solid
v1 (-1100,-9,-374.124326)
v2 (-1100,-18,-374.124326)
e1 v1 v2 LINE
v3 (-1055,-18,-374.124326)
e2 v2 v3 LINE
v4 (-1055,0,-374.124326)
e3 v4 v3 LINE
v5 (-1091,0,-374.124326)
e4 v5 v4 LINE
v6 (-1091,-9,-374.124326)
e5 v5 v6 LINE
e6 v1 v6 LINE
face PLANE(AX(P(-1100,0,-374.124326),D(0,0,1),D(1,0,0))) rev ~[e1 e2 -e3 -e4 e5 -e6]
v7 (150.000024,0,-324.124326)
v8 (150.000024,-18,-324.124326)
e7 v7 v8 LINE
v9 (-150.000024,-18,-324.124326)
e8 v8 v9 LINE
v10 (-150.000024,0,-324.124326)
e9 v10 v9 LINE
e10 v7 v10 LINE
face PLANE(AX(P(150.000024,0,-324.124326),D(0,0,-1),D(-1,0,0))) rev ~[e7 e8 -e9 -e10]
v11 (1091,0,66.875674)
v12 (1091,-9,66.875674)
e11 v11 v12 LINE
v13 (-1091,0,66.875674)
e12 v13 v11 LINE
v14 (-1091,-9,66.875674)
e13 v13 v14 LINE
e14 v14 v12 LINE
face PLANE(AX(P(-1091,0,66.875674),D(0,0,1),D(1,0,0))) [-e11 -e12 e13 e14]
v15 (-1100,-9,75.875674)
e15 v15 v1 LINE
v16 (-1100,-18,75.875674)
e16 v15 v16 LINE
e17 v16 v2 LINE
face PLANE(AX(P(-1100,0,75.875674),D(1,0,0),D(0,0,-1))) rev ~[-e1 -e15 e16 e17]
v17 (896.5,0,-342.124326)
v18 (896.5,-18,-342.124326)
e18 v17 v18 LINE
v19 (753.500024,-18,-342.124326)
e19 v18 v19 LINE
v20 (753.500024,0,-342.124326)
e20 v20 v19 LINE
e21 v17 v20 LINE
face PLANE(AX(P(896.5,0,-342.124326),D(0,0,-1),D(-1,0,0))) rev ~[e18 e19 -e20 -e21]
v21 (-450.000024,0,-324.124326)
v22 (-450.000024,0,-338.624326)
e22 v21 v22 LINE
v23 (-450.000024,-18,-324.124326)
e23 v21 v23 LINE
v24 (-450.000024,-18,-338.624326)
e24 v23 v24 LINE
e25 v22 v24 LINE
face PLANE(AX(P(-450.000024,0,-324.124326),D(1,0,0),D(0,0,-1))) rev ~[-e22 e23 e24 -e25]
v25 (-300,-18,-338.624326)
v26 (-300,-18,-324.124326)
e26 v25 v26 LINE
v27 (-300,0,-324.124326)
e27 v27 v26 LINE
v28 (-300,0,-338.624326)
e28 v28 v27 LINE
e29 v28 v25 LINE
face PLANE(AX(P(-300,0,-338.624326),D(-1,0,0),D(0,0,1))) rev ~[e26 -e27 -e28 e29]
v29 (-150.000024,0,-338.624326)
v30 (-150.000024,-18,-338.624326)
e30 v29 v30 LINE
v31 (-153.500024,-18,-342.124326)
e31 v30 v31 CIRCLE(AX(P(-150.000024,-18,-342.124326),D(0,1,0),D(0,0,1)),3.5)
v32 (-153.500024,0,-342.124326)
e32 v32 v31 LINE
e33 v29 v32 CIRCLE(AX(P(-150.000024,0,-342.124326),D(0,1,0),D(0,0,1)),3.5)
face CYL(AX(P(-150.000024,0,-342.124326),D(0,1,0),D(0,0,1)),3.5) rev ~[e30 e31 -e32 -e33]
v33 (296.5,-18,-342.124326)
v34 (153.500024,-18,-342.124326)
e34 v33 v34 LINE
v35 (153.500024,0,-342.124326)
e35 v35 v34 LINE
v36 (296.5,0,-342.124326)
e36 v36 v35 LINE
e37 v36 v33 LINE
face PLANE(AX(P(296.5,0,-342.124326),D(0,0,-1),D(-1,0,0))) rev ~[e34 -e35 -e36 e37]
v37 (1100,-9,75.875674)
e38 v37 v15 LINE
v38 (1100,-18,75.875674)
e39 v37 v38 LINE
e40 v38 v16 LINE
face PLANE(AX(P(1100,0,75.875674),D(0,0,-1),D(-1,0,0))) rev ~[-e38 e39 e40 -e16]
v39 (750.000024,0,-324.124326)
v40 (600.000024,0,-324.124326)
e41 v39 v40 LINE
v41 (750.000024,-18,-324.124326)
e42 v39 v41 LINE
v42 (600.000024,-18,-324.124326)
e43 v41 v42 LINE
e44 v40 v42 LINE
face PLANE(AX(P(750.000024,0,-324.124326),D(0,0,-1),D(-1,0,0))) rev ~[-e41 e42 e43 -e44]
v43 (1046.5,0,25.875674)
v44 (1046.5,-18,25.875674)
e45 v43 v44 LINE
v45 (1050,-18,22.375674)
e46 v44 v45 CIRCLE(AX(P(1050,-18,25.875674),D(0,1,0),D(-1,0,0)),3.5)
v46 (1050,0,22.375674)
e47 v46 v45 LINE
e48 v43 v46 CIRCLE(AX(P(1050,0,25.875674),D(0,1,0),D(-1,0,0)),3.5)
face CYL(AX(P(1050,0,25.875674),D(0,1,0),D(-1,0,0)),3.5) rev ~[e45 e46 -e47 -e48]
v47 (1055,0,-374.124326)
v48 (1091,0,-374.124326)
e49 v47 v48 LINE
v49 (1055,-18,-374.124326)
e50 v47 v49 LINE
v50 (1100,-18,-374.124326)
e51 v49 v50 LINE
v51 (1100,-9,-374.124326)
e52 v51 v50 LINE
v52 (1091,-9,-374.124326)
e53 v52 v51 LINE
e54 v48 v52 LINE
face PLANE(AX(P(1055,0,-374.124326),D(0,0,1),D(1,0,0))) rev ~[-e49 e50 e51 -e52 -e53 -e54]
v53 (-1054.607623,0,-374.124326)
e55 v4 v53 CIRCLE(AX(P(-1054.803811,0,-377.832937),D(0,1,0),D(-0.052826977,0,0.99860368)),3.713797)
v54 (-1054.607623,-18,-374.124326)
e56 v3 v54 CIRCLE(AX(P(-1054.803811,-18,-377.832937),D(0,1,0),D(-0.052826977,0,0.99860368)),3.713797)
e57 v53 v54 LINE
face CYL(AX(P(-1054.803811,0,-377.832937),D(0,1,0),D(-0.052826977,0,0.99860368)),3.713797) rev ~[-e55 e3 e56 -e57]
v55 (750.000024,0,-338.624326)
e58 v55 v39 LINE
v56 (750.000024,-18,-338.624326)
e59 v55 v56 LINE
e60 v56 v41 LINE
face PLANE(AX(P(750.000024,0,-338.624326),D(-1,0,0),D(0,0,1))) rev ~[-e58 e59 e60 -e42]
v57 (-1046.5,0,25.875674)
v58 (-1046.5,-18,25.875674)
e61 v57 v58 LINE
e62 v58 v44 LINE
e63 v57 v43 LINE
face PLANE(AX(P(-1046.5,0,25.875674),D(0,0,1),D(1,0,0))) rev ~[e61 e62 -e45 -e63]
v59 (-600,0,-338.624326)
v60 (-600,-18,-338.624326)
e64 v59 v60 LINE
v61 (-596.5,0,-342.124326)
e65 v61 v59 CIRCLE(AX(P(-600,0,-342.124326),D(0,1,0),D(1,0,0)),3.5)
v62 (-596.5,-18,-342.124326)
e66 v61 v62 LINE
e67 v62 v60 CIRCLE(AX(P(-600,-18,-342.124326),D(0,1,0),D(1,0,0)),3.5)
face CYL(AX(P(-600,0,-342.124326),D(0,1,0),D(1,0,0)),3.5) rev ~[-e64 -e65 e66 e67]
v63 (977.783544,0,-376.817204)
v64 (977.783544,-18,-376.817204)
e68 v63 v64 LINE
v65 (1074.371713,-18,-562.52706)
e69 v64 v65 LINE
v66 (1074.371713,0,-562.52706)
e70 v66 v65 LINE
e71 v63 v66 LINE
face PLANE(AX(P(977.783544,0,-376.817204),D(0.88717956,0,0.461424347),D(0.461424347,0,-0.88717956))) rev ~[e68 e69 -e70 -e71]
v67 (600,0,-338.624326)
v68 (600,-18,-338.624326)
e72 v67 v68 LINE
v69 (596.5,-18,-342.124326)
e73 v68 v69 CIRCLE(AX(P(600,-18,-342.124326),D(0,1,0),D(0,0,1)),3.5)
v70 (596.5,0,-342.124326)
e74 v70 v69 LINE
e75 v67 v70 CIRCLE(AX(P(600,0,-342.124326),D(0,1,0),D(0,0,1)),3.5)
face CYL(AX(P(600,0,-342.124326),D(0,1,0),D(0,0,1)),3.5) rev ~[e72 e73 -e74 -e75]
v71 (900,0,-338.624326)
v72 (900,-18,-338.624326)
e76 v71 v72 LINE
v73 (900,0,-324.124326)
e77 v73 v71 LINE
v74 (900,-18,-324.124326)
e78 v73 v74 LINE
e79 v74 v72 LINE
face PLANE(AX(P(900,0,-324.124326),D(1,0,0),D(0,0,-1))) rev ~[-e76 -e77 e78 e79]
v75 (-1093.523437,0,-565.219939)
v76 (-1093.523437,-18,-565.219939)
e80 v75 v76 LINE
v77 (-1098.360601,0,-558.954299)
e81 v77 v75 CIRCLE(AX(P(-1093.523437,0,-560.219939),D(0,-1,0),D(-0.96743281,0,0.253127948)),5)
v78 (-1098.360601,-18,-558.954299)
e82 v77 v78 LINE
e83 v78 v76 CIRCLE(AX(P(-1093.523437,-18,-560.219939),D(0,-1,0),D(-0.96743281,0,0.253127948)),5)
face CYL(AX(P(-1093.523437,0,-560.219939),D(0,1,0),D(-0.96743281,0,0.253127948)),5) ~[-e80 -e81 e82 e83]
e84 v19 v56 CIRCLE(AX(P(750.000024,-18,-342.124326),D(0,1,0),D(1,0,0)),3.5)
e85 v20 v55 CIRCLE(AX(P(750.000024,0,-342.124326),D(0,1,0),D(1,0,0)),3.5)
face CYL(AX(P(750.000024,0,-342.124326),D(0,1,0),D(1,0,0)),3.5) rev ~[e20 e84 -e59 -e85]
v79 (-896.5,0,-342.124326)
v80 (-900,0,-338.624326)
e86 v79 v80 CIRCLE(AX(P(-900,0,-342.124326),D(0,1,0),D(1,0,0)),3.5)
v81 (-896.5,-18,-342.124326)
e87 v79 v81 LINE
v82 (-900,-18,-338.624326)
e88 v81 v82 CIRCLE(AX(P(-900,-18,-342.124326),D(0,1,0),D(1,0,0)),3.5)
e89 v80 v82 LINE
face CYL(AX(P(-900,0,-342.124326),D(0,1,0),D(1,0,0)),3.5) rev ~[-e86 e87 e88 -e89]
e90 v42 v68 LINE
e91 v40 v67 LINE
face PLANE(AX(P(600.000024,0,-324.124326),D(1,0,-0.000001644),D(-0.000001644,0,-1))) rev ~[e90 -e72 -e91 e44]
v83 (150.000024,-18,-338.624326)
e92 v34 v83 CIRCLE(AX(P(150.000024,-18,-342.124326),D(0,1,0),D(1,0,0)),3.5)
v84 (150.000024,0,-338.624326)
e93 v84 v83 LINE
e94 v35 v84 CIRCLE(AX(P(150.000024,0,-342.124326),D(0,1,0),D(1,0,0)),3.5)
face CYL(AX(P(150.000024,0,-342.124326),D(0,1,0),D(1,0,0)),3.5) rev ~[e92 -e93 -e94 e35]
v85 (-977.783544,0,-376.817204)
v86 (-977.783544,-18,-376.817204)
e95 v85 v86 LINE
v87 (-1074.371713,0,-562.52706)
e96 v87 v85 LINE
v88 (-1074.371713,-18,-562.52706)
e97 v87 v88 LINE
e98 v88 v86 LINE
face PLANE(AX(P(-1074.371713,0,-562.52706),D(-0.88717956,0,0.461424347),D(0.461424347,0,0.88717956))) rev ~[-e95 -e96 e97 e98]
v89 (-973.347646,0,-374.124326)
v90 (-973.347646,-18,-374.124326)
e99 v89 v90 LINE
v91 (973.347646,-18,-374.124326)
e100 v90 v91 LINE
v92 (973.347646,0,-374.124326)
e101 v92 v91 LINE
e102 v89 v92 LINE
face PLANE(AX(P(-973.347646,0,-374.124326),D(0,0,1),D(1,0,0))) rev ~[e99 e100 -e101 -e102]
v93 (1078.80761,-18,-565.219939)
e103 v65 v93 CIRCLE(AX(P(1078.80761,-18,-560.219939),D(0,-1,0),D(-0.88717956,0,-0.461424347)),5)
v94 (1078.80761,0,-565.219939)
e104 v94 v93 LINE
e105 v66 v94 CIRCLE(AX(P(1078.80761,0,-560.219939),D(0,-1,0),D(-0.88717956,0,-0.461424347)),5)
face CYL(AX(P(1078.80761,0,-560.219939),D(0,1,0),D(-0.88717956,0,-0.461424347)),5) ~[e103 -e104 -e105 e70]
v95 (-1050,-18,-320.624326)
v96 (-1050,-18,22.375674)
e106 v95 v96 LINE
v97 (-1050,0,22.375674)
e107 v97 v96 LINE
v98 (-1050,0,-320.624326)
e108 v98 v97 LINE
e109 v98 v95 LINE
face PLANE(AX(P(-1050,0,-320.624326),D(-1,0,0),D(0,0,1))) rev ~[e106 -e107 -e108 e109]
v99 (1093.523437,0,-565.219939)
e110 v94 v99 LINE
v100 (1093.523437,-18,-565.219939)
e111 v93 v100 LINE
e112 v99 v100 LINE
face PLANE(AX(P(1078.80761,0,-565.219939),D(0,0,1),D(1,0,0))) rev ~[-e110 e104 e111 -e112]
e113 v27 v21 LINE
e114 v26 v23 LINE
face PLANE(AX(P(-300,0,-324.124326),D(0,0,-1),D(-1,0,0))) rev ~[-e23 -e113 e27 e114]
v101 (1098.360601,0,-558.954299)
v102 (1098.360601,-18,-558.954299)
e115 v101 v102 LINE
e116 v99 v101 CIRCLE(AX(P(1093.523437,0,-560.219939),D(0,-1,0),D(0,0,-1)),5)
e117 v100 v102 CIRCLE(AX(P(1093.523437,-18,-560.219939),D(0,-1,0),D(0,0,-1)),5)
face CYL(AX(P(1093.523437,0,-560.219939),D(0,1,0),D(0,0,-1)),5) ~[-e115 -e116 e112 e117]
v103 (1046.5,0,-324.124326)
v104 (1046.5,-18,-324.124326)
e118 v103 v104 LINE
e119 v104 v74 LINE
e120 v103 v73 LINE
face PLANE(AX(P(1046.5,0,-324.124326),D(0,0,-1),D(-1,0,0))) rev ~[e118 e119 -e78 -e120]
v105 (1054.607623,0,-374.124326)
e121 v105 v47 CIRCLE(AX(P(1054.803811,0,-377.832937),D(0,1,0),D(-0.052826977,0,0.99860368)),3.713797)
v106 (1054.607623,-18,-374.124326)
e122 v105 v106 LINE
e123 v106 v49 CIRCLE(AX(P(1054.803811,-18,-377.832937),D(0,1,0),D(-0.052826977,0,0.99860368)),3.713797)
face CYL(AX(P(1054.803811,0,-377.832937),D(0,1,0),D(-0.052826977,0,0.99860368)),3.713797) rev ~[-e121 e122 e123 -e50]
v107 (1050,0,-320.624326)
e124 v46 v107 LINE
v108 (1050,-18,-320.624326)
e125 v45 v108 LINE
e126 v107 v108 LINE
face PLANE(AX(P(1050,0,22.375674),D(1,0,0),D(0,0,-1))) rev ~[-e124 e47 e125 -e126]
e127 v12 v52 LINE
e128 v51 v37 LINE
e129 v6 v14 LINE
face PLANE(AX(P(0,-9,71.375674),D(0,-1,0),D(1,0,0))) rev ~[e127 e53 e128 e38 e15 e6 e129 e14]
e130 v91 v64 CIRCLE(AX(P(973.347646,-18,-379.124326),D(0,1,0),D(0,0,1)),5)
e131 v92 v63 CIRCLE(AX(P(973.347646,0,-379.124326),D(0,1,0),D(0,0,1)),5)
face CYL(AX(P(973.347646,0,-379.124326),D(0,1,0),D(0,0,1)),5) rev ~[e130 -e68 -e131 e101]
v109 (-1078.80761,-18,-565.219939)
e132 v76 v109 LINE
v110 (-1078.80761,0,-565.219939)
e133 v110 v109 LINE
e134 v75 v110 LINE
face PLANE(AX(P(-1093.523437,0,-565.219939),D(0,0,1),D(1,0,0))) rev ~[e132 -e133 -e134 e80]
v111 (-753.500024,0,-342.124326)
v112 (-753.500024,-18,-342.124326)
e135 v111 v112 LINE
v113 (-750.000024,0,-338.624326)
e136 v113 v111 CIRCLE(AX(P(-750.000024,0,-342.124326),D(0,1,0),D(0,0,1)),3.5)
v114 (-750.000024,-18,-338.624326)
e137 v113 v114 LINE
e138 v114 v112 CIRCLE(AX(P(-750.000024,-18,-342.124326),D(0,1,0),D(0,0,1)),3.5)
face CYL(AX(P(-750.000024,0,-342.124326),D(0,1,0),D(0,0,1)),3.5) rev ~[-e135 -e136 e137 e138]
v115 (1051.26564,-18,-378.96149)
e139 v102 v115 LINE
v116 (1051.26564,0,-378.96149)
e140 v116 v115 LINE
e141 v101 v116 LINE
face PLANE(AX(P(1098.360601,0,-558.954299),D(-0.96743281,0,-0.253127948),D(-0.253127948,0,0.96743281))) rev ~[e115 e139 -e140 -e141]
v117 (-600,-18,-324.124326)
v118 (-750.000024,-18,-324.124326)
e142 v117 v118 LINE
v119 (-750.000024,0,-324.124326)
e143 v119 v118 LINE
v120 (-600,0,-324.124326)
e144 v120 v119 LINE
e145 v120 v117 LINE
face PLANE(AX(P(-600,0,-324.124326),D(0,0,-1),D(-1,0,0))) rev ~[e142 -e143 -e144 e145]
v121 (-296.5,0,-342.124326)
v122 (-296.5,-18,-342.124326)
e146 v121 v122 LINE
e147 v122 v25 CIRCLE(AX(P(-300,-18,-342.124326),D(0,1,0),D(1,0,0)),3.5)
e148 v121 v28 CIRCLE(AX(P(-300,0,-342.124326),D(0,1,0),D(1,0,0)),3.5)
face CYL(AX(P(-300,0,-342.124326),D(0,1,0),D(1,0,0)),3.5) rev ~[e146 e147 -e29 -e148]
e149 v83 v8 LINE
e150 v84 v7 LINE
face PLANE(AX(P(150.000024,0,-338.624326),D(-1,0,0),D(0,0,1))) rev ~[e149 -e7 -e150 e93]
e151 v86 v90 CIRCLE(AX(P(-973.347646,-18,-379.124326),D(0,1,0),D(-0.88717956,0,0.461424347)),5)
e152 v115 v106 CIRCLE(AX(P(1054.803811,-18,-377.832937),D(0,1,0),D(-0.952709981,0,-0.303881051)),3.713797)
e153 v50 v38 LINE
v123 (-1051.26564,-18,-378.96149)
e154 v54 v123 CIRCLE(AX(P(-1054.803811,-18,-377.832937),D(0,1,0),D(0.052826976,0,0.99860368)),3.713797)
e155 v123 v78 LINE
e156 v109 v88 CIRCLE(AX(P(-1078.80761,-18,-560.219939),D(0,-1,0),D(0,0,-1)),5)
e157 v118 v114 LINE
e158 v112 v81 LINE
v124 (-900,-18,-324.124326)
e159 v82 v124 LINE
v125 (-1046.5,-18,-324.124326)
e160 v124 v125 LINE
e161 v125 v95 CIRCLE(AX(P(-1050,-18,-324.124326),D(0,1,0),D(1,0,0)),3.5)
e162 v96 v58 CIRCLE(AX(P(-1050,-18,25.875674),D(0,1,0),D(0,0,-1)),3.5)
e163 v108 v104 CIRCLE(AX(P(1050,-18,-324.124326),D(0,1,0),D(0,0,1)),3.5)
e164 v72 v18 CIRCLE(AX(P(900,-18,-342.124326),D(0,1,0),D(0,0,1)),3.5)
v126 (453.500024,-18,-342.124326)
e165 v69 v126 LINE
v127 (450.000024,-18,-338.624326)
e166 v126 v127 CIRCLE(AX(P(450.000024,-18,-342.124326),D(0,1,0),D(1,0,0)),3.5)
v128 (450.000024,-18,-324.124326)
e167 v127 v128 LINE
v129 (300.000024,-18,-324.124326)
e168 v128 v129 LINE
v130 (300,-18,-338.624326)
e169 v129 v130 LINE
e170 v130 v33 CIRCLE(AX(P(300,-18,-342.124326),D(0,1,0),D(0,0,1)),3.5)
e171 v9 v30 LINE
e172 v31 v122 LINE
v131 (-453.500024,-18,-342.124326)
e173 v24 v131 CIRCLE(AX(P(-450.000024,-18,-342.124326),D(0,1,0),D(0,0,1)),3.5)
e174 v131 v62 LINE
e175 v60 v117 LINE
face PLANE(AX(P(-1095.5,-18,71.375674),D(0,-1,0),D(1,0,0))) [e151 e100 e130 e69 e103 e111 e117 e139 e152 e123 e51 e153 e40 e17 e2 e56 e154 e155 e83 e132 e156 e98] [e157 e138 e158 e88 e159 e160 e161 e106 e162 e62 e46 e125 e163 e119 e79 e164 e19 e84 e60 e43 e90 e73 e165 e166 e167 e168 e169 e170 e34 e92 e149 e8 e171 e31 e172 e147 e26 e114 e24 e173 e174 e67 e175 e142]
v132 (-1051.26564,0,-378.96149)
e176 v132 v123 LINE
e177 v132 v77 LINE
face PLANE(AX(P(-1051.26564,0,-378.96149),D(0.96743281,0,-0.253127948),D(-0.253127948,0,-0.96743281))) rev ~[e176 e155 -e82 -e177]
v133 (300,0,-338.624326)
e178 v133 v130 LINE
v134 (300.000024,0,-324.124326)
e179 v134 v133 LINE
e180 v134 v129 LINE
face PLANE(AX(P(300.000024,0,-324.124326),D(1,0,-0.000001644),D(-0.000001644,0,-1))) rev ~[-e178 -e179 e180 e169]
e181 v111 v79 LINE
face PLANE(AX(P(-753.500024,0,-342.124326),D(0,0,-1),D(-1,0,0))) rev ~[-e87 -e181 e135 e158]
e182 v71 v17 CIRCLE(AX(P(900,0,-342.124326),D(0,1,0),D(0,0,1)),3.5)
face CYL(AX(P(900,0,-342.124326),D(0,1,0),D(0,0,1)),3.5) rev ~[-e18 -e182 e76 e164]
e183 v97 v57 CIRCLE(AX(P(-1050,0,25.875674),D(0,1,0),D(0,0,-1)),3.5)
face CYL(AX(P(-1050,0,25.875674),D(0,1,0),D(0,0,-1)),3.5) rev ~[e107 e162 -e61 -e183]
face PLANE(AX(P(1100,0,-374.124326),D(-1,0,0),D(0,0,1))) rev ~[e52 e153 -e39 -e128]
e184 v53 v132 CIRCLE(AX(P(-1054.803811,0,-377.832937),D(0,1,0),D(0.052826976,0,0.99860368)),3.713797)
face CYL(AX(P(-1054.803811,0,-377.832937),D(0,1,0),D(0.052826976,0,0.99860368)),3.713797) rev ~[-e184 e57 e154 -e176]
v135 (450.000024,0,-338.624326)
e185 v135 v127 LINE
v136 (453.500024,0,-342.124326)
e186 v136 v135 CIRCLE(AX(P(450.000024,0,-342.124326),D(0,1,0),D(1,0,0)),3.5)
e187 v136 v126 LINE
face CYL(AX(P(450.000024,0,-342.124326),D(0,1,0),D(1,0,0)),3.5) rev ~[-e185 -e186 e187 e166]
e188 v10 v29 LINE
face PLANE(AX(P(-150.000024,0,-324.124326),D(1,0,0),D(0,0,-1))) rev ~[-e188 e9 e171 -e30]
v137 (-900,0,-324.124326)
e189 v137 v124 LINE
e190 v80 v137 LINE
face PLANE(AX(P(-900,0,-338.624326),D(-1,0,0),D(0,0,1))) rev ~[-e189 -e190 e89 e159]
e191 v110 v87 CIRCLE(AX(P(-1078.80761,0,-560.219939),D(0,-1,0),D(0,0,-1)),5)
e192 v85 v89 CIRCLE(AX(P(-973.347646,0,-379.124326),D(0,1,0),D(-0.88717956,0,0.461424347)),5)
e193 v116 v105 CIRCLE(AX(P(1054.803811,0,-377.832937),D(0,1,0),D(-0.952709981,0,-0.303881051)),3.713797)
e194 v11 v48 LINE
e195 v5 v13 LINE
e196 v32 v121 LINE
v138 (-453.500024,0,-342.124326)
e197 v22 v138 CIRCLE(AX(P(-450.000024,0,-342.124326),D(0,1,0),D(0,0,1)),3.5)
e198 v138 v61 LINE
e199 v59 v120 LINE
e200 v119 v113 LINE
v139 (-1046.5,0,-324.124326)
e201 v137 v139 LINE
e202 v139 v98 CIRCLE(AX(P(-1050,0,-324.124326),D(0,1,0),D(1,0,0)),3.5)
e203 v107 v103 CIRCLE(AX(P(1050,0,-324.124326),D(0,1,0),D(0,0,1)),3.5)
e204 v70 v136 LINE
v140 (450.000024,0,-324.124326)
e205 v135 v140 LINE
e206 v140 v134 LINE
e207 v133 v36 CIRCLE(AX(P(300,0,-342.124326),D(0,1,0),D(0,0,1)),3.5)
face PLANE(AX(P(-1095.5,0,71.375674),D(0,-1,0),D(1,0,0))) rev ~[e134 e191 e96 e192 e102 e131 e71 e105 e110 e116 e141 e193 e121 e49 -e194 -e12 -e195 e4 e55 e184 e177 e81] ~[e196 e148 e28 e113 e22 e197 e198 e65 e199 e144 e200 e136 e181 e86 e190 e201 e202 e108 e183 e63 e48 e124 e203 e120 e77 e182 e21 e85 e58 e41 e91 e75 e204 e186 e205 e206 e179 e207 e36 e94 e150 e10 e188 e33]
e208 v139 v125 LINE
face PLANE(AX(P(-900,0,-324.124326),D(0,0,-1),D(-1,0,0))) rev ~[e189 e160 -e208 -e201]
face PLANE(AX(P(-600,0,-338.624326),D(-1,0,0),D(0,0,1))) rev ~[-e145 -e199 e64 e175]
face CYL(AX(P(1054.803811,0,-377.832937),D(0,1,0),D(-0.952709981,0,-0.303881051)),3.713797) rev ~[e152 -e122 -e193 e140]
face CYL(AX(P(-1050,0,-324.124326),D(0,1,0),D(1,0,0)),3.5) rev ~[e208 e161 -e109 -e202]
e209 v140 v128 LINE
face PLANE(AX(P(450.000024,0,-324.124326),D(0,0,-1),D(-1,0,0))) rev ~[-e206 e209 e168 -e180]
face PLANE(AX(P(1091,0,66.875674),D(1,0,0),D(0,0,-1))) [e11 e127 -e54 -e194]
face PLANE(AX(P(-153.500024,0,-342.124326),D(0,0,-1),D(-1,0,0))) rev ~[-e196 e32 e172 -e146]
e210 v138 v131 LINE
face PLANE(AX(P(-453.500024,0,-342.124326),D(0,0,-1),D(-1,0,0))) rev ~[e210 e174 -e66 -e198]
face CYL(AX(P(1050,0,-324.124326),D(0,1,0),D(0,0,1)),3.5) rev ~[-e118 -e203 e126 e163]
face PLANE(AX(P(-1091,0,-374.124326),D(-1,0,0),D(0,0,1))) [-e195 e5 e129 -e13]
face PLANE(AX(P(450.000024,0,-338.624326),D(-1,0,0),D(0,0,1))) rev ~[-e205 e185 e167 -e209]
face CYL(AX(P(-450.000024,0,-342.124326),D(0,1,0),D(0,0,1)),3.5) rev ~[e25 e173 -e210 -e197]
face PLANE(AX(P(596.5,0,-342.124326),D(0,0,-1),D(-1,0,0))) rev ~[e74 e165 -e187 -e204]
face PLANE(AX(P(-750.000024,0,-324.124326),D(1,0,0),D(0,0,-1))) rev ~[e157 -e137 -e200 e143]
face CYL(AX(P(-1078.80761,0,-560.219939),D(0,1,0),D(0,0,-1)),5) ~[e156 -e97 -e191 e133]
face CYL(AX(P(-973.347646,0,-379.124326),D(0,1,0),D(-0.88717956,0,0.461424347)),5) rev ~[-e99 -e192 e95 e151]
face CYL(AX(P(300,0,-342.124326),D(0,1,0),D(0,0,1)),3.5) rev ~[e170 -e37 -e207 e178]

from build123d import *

# Parameters (mm, degrees)
F0_W     = 9
F0_H     = 9
F0_H_2   = 441
F1_DEPTH = 18
F2_DEPTH = 9


# Not quite as in the source:
# - ends of sketch curves that miss each other by under 0.0002 mm in the source are joined


with BuildPart() as f1:
    # F0 (on Front) → F1 (new body)
    with BuildSketch(Plane.XZ):
        with Locations((-1095.5, 71.3756743552)):
            Rectangle(F0_W, F0_H)
        with BuildLine():
            Line((0, 66.8756743552), (-1091, 66.8756743552))
            Line((-1091, 66.8756743552), (-1091, -374.1243256448))
            Line((-1091, -374.1243256448), (-1055, -374.1243256448))
            ThreePointArc((-1055, -374.1243256448), (-1054.8038113281, -374.1191399972), (-1054.6076226562, -374.1243256448))
            Line((-1054.6076226562, -374.1243256448), (-973.3476458471, -374.1243256448))
            Line((-973.3476458471, -374.1243256448), (0, -374.1243256448))
            Line((0, -374.1243256448), (973.3476458471, -374.1243256448))
            Line((973.3476458471, -374.1243256448), (1054.6076226562, -374.1243256448))
            ThreePointArc((1054.6076226562, -374.1243256448), (1054.8038113281, -374.1191399972), (1055, -374.1243256448))
            Line((1055, -374.1243256448), (1091, -374.1243256448))
            Line((1091, -374.1243256448), (1091, -365.1243256448))
            Line((1091, -365.1243256448), (1091, -365.0378882885))
            Line((1091, -365.0378882885), (1091, 66.8756743552))
            Line((1091, 66.8756743552), (0, 66.8756743552))
        make_face()
        with BuildLine():
            Line((-1050, -320.6243256448), (-1050, 22.3756743552))
            ThreePointArc((-1050, 22.3756743552), (-1052.4748737342, 28.3505480894), (-1046.5, 25.8756743552))
            Line((-1046.5, 25.8756743552), (0, 25.8756743552))
            Line((0, 25.8756743552), (1046.5, 25.8756743552))
            ThreePointArc((1046.5, 25.8756743552), (1052.4748737342, 28.3505480894), (1050, 22.3756743552))
            Line((1050, 22.3756743552), (1050, -320.6243256448))
            ThreePointArc((1050, -320.6243256448), (1052.4748737342, -326.5991993789), (1046.5, -324.1243256448))
            Line((1046.5, -324.1243256448), (900, -324.1243256448))
            Line((900, -324.1243256448), (900, -338.6243256448))
            ThreePointArc((900, -338.6243256448), (902.4748737342, -344.5991993789), (896.5, -342.1243256448))
            Line((896.5, -342.1243256448), (753.5000238419, -342.1243256448))
            ThreePointArc((753.5000238419, -342.1243256448), (747.5251501077, -344.5991993789), (750.0000238419, -338.6243256448))
            Line((750.0000238419, -338.6243256448), (750.0000238419, -324.1243256448))
            Line((750.0000238419, -324.1243256448), (600.0000238419, -324.1243256448))
            Line((600.0000238419, -324.1243256448), (600, -338.6243256448))
            ThreePointArc((600, -338.6243256448), (602.4748737342, -344.5991993789), (596.5, -342.1243256448))
            Line((596.5, -342.1243256448), (453.5000238419, -342.1243256448))
            ThreePointArc((453.5000238419, -342.1243256448), (447.5251501077, -344.5991993789), (450.0000238419, -338.6243256448))
            Line((450.0000238419, -338.6243256448), (450.0000238419, -324.1243256448))
            Line((450.0000238419, -324.1243256448), (300.0000238419, -324.1243256448))
            Line((300.0000238419, -324.1243256448), (300, -338.6243256448))
            ThreePointArc((300, -338.6243256448), (302.4748737342, -344.5991993789), (296.5, -342.1243256448))
            Line((296.5, -342.1243256448), (153.5000238419, -342.1243256448))
            ThreePointArc((153.5000238419, -342.1243256448), (147.5251501077, -344.5991993789), (150.0000238419, -338.6243256448))
            Line((150.0000238419, -338.6243256448), (150.0000238419, -324.1243256448))
            Line((150.0000238419, -324.1243256448), (2.38419e-05, -324.1243256448))
            Line((2.38419e-05, -324.1243256448), (-150.0000238419, -324.1243256448))
            Line((-150.0000238419, -324.1243256448), (-150.0000238419, -338.6243256448))
            ThreePointArc((-150.0000238419, -338.6243256448), (-147.5251501077, -344.5991993789), (-153.5000238419, -342.1243256448))
            Line((-153.5000238419, -342.1243256448), (-296.5, -342.1243256448))
            ThreePointArc((-296.5, -342.1243256448), (-302.4748737342, -344.5991993789), (-300, -338.6243256448))
            Line((-300, -338.6243256448), (-300, -324.1243256448))
            Line((-300, -324.1243256448), (-450.0000238419, -324.1243256448))
            Line((-450.0000238419, -324.1243256448), (-450.0000238419, -338.6243256448))
            ThreePointArc((-450.0000238419, -338.6243256448), (-447.5251501077, -344.5991993789), (-453.5000238419, -342.1243256448))
            Line((-453.5000238419, -342.1243256448), (-596.5, -342.1243256448))
            ThreePointArc((-596.5, -342.1243256448), (-602.4748737342, -344.5991993789), (-600, -338.6243256448))
            Line((-600, -338.6243256448), (-600, -324.1243256448))
            Line((-600, -324.1243256448), (-750.0000238419, -324.1243256448))
            Line((-750.0000238419, -324.1243256448), (-750.0000238419, -338.6243256448))
            ThreePointArc((-750.0000238419, -338.6243256448), (-747.5251501077, -344.5991993789), (-753.5000238419, -342.1243256448))
            Line((-753.5000238419, -342.1243256448), (-896.5, -342.1243256448))
            ThreePointArc((-896.5, -342.1243256448), (-902.4748737342, -344.5991993789), (-900, -338.6243256448))
            Line((-900, -338.6243256448), (-900, -324.1243256448))
            Line((-900, -324.1243256448), (-1046.5, -324.1243256448))
            ThreePointArc((-1046.5, -324.1243256448), (-1052.4748737342, -326.5991993789), (-1050, -320.6243256448))
        make_face(mode=Mode.SUBTRACT)
        with BuildLine():
            Line((-973.3476458471, -374.1243256448), (-1054.6076226562, -374.1243256448))
            ThreePointArc((-1054.6076226562, -374.1243256448), (-1051.7483407187, -375.721921149), (-1051.265639742, -378.9614896944))
            Line((-1051.265639742, -378.9614896944), (-1098.3606008427, -558.954299013))
            ThreePointArc((-1098.3606008427, -558.954299013), (-1097.4812264988, -563.2754093644), (-1093.523436793, -565.219938755))
            Line((-1093.523436793, -565.219938755), (-1078.8076104242, -565.219938755))
            ThreePointArc((-1078.8076104242, -565.219938755), (-1076.2129629213, -564.4940239596), (-1074.371712623, -562.5270604893))
            Line((-1074.371712623, -562.5270604893), (-977.7835436484, -376.8172039105))
            ThreePointArc((-977.7835436484, -376.8172039105), (-975.94229335, -374.8502404402), (-973.3476458471, -374.1243256448))
        make_face()
        Polygon((1100, 66.8756743552), (1091, 66.8756743552), (1091, -365.0378882885), (1091, -365.1243256448), (1091, -374.1243256448), (1100, -374.1243256448), align=None)
        Polygon((0, 75.8756743552), (-1091, 75.8756743552), (-1091, 66.8756743552), (0, 66.8756743552), (1091, 66.8756743552), (1091, 75.8756743552), align=None)
        with Locations((-1095.5, -153.6243256448)):
            Rectangle(F0_W, F0_H_2)
        with Locations((1095.5, 71.3756743552)):
            Rectangle(F0_W, F0_H)
        with BuildLine():
            Line((1054.6076226562, -374.1243256448), (973.3476458471, -374.1243256448))
            ThreePointArc((973.3476458471, -374.1243256448), (975.94229335, -374.8502404402), (977.7835436484, -376.8172039105))
            Line((977.7835436484, -376.8172039105), (1074.371712623, -562.5270604893))
            ThreePointArc((1074.371712623, -562.5270604893), (1076.2129629213, -564.4940239596), (1078.8076104242, -565.219938755))
            Line((1078.8076104242, -565.219938755), (1093.523436793, -565.219938755))
            ThreePointArc((1093.523436793, -565.219938755), (1097.4812264988, -563.2754093644), (1098.3606008427, -558.954299013))
            Line((1098.3606008427, -558.954299013), (1051.265639742, -378.9614896944))
            ThreePointArc((1051.265639742, -378.9614896944), (1051.7483407187, -375.721921149), (1054.6076226562, -374.1243256448))
        make_face()
    extrude(amount=F1_DEPTH)

    # F0 (on Front) → F2 (cut)
    with BuildSketch(Plane.XZ):
        Polygon((0, 75.8756743552), (-1091, 75.8756743552), (-1091, 66.8756743552), (0, 66.8756743552), (1091, 66.8756743552), (1091, 75.8756743552), align=None)
        with Locations((1095.5, 71.3756743552)):
            Rectangle(F0_W, F0_H)
        with Locations((-1095.5, -153.6243256448)):
            Rectangle(F0_W, F0_H_2)
        with Locations((-1095.5, 71.3756743552)):
            Rectangle(F0_W, F0_H)
        Polygon((1100, 66.8756743552), (1091, 66.8756743552), (1091, -365.0378882885), (1091, -365.1243256448), (1091, -374.1243256448), (1100, -374.1243256448), align=None)
    extrude(amount=F2_DEPTH, mode=Mode.SUBTRACT)


solid = f1.part
